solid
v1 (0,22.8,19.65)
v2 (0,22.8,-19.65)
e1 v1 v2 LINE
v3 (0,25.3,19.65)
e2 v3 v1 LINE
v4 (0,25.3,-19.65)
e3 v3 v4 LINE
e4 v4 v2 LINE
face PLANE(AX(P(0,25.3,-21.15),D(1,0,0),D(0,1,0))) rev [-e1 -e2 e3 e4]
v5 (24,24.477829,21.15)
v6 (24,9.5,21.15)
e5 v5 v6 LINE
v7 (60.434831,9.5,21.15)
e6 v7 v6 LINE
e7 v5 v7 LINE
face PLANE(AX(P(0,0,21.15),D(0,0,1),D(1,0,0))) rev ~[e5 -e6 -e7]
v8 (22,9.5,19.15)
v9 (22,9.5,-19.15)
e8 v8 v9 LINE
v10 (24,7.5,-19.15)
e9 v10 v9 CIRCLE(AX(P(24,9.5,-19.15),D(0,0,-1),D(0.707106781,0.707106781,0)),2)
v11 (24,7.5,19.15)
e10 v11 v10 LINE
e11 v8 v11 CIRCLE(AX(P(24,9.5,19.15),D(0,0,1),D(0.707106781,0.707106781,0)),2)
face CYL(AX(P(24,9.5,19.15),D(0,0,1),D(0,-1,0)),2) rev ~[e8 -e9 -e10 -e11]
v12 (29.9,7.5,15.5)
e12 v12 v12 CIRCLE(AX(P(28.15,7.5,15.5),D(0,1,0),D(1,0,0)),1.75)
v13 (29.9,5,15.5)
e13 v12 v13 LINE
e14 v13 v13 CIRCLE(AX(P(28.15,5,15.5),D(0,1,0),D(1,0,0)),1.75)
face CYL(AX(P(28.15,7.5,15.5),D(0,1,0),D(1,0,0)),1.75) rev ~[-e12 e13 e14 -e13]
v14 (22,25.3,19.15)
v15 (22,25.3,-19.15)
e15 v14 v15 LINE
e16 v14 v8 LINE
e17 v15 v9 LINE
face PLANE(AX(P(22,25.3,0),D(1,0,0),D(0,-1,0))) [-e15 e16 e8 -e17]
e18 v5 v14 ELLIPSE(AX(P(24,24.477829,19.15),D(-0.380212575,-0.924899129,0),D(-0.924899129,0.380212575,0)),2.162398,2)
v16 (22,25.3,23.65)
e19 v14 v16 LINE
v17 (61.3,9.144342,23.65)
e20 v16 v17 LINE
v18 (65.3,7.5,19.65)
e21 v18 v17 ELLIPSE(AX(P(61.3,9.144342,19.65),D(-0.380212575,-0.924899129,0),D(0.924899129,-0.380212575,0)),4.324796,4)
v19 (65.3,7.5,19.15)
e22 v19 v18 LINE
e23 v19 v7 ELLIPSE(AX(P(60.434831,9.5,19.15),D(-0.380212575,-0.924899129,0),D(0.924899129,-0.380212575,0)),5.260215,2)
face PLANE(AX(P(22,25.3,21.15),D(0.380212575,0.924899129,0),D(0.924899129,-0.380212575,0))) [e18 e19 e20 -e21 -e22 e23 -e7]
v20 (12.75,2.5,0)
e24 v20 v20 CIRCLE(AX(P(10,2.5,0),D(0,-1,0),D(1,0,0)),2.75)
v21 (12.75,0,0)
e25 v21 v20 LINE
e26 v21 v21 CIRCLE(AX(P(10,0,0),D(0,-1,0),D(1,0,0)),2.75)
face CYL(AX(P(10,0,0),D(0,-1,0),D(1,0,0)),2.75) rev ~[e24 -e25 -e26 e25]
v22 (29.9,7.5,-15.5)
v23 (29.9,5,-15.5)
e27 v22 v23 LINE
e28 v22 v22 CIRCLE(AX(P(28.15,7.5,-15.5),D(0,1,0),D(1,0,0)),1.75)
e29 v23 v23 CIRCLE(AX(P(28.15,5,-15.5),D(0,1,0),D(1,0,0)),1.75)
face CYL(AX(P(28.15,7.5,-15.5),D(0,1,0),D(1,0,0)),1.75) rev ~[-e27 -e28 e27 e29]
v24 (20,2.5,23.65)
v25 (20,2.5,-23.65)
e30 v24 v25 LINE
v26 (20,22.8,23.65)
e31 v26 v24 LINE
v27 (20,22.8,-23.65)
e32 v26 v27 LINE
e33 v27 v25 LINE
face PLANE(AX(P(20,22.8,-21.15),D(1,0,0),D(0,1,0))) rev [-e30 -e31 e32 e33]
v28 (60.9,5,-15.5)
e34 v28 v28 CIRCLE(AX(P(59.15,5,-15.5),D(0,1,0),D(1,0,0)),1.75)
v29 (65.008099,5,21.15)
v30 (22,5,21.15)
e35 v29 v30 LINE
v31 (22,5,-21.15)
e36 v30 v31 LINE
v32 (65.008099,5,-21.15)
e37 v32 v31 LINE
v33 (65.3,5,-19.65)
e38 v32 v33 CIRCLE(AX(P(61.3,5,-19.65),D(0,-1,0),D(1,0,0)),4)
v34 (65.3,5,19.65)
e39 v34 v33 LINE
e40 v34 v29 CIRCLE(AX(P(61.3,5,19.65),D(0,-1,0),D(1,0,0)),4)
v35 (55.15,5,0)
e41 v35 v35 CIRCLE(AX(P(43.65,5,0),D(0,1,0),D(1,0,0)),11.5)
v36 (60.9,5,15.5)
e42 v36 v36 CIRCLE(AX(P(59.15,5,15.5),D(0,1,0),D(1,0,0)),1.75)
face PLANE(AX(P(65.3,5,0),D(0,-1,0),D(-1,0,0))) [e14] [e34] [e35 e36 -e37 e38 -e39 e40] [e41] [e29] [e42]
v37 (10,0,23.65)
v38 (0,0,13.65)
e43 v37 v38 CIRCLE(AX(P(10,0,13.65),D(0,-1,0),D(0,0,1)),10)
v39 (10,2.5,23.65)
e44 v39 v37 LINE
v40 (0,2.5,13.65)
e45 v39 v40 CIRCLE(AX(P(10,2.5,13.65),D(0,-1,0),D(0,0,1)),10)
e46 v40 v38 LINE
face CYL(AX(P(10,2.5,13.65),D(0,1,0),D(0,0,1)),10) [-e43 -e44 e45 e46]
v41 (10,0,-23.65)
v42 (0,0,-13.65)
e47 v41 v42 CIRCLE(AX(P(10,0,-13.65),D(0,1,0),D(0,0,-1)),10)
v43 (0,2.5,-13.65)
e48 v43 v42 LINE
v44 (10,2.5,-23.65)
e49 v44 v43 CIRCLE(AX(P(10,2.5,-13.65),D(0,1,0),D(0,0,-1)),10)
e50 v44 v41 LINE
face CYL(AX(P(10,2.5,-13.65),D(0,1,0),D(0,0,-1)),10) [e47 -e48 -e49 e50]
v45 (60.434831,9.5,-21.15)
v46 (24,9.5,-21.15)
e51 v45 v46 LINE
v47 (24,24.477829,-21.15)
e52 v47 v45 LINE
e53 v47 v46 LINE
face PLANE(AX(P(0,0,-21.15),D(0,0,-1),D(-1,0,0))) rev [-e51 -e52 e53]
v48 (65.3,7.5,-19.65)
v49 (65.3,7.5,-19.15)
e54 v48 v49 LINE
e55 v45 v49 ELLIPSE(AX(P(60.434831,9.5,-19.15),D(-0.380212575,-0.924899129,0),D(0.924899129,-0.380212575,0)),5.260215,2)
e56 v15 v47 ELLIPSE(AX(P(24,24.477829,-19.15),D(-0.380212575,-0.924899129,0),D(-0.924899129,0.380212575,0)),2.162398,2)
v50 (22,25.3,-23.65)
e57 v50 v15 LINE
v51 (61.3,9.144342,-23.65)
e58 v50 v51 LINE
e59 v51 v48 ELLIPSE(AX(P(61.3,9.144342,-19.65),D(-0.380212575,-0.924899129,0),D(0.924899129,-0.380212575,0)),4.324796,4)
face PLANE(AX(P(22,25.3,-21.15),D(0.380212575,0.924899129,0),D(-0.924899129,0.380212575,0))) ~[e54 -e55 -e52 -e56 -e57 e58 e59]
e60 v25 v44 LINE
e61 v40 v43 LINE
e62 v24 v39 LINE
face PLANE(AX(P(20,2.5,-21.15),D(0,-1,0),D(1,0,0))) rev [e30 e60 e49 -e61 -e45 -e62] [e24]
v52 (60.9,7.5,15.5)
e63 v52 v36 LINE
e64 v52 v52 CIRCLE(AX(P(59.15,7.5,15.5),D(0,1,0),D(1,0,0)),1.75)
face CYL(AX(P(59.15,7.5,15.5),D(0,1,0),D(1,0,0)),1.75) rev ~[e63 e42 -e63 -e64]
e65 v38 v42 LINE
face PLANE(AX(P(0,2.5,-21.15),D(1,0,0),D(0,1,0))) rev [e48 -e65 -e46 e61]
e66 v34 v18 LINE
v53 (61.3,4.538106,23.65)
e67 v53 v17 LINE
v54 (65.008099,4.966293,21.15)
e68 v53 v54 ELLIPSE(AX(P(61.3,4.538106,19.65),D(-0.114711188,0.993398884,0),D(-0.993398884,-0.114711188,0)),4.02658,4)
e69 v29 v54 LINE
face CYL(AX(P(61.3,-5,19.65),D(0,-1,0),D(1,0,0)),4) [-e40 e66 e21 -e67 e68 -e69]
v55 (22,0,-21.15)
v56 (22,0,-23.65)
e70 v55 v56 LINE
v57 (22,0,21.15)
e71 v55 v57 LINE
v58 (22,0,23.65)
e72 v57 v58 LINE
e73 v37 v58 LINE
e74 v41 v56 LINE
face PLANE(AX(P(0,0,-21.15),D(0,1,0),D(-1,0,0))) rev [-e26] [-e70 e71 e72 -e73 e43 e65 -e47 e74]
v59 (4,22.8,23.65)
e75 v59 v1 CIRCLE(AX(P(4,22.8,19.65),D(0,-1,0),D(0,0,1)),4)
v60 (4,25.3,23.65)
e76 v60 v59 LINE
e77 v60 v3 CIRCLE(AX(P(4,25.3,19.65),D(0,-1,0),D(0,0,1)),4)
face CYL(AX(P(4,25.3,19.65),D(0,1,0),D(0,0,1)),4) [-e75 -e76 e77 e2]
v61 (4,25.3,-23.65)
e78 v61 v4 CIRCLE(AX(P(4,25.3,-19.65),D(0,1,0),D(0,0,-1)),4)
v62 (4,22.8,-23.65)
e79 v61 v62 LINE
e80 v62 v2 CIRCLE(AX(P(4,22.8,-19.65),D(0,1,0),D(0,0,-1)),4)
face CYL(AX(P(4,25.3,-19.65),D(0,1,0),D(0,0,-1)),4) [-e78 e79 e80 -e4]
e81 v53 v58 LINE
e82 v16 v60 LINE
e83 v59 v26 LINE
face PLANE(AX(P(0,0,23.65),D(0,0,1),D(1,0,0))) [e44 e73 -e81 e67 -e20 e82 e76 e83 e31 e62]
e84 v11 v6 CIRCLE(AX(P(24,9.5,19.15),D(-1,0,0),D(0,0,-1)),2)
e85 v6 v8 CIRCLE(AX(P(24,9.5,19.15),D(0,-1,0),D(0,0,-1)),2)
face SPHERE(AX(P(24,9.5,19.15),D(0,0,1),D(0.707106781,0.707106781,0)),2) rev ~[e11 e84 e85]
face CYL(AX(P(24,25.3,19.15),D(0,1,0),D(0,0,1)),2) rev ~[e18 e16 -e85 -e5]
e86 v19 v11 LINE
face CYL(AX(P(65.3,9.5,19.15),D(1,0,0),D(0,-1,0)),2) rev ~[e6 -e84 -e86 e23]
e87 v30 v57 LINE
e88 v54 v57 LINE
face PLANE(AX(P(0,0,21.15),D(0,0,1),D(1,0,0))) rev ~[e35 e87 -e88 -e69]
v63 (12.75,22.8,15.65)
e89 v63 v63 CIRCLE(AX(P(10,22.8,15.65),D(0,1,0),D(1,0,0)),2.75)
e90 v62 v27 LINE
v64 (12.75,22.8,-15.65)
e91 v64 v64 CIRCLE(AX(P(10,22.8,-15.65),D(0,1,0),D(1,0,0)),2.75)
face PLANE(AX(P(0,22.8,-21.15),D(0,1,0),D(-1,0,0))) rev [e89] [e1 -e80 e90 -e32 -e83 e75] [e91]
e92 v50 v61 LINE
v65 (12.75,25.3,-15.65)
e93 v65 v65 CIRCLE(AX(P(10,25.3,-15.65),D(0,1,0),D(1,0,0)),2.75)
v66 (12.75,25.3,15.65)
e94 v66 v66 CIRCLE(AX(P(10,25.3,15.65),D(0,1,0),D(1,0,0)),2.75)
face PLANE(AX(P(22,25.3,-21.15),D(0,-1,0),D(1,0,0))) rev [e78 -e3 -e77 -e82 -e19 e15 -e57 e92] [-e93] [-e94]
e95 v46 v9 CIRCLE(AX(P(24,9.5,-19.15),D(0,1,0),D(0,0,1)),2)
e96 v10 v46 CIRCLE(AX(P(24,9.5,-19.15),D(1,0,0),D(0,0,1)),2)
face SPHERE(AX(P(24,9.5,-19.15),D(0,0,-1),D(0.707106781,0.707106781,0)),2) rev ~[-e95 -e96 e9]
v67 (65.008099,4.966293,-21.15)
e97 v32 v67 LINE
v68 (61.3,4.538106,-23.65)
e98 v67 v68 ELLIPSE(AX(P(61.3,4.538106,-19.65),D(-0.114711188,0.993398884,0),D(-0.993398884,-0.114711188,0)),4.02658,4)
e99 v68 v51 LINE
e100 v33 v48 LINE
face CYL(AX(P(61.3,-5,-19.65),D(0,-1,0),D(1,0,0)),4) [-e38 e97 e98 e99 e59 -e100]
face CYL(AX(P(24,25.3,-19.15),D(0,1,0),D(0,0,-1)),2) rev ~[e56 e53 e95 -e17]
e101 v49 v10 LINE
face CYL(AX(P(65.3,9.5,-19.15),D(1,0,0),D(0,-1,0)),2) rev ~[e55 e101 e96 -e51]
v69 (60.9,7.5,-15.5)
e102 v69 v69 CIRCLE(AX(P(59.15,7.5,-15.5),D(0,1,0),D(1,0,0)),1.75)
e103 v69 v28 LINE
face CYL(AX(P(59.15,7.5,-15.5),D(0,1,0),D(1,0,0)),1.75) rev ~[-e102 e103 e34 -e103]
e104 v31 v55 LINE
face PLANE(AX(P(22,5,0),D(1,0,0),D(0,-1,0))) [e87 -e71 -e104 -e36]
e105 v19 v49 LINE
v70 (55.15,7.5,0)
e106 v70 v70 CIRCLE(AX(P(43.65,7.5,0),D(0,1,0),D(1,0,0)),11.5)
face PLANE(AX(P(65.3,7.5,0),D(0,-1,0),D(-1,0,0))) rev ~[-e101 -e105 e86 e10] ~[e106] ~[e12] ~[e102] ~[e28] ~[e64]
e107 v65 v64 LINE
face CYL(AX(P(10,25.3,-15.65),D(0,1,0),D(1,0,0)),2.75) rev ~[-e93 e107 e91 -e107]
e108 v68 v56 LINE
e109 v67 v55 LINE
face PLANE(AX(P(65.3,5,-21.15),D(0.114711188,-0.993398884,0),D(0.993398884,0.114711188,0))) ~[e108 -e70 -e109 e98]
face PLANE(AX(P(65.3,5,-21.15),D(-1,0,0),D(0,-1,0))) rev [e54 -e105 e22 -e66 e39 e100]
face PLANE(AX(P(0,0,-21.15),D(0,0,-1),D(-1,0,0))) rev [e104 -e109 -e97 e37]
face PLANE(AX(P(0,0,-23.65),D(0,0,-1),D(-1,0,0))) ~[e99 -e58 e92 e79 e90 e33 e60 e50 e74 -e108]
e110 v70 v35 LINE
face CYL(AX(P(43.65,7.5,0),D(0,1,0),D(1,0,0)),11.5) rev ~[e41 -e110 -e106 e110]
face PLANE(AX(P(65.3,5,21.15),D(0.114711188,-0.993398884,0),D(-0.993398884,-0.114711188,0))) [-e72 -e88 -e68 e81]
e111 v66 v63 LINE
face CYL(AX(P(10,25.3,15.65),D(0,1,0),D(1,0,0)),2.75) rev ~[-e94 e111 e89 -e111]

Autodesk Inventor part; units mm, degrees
ref_plane "YZ Plane" through (0, 0, 0) normal (1, 0, 0) x (0, 1, 0)
ref_plane "XZ Plane" through (0, 0, 0) normal (0, 1, 0) x (-1, 0, 0)
ref_plane "XY Plane" through (0, 0, 0) normal (0, 0, 1) x (1, 0, 0)
sketch "Sketch1" plane through (0, 0, 0) normal (0, 0, 1) x (1, 0, 0)
  line L0 (0, 0) -> (20, 0)
  line L1 (20, 0) -> (20, 2.5) construction
  line L2 (20, 2.5) -> (0, 2.5)
  line L3 (0, 2.5) -> (0, 0)
  line L4 (0, 25.3) -> (20, 25.3)
  line L5 (20, 25.3) -> (20, 22.8) construction
  line L6 (20, 22.8) -> (0, 22.8)
  line L7 (0, 22.8) -> (0, 25.3)
  line L8 (20, 22.8) -> (20, 2.5)
  line L9 (20, 25.3) -> (22, 25.3)
  line L10 (22, 25.3) -> (65.3, 7.5) construction
  line L11 (65.3, 7.5) -> (65.3, 5)
  line L12 (65.3, 5) -> (22, 0) construction
  line L13 (22, 0) -> (20, 0)
  line L14 (22, 25.3) -> (22, 0) construction
  line L15 (22, 25.3) -> (22, 7.5)
  line L16 (65.3, 7.5) -> (22, 7.5)
  line L17 (65.3, 5) -> (22, 5)
  line L18 (22, 5) -> (22, 0)
  dimension "d0" = 2.5
  dimension "d1" = 2.5
  dimension "d2" = 20
  dimension "d3" = 20.3
  dimension "d4" = 2
  dimension "d5" = 43.3
  dimension "d6" = 5
  dimension "d7" = 2.5
extrude "Extrusion1" add sketch "Sketch1" along normal mid plane 42.3
sketch "Sketch2" plane through (0, 0, 21.15) normal (0, 0, 1) x (1, 0, 0)
  line L0 (65.3, 5) -> (65.3, 7.5) projected
  line L1 (65.3, 7.5) -> (22, 7.5) construction
  line L2 (22, 7.5) -> (22, 25.3) construction
  line L3 (22, 25.3) -> (0, 25.3) projected
  line L4 (0, 25.3) -> (0, 22.8) projected
  line L5 (0, 22.8) -> (20, 22.8) projected
  line L6 (20, 22.8) -> (20, 2.5) projected
  line L7 (20, 2.5) -> (0, 2.5) projected
  line L8 (0, 2.5) -> (0, 0) projected
  line L9 (0, 0) -> (22, 0) projected
  line L10 (22, 0) -> (22, 5) construction
  line L11 (22, 5) -> (65.3, 5) construction
  line L12 (22, 7.5) -> (22, 25.3) construction
  line L13 (22, 25.3) -> (65.3, 7.5)
  line L14 (65.3, 5) -> (65.3, 7.5) projected
  line L15 (65.3, 5) -> (22, 0)
extrude "Extrusion2" add sketch "Sketch2" along normal blind 2.5
mirror "Mirror1" about plane through (0, 0, 0) normal (0, 0, 1) of "Extrusion2"
sketch "Sketch3" plane through (0, 25.3, 23.65) normal (0, 1, 0) x (1, 0, 0)
  line L0 (0, 47.3) -> (22, 47.3) projected
  line L1 (10, 47.3) -> (10, 0) construction
  line L2 (0, 0) -> (20, 0) projected
  circle A0 centre (10, 8) radius 2.75
  circle A1 centre (10, 39.3) radius 2.75
  line L3 (0, 47.3) -> (0, 0) projected
  point P0 (0, 23.65)
  dimension "d12" = 8
  dimension "d13" = 8
  dimension "d14" = 5.5
  dimension "d15" = 10
extrude "Extrusion3" cut sketch "Sketch3" against normal up to surface (2.5 mm away)
sketch "Sketch4" plane through (0, 0, 23.65) normal (0, -1, 0) x (1, 0, 0)
  line L0 (0, -23.65) -> (10, -23.65) construction
  circle A0 centre (10, -23.65) radius 2.75
  dimension "d18" = 5.5
  dimension "d19" = 10
extrude "Extrusion4" cut sketch "Sketch4" against normal up to surface (2.5 mm away)
sketch "Sketch5" plane through (22, 7.5, 21.15) normal (0, 1, 0) x (1, 0, 0)
  line L0 (0, 0) -> (0, -2.5) projected
  line L1 (43.3, 42.3) -> (43.3, 44.8) projected
  line L2 (0, 0) -> (43.3, 42.3) construction
  line L3 (6.15, 5.65) -> (37.15, 5.65) construction
  line L4 (37.15, 5.65) -> (37.15, 36.65) construction
  line L5 (37.15, 36.65) -> (6.15, 36.65) construction
  line L6 (6.15, 36.65) -> (6.15, 5.65) construction
  line L7 (6.15, 5.65) -> (37.15, 36.65) construction
  line L8 (37.15, 5.65) -> (6.15, 36.65) construction
  circle A0 centre (6.15, 36.65) radius 1.75
  circle A1 centre (37.15, 36.65) radius 1.75
  circle A2 centre (37.15, 5.65) radius 1.75
  circle A3 centre (6.15, 5.65) radius 1.75
  circle A4 centre (21.65, 21.15) radius 11.5
  point P0 (-22, 21.15)
  dimension "d22" = 31
  dimension "d23" = 31
  dimension "d24" = 3.5
  dimension "d25" = 23
extrude "Extrusion5" cut sketch "Sketch5" against normal through all
fillet "Fillet1" radius 10 2 edges at (0, 1.25, -23.65) (0, 1.25, 23.65)
fillet "Fillet1" radius 4 4 edges at (0, 24.05, -23.65) (0, 24.05, 23.65) (65.3, 6.25, 23.65) (65.3, 6.25, -23.65)
fillet "Fillet1" radius 2 5 edges at (43.65, 7.5, -21.15) (22, 7.5, 0) (43.65, 7.5, 21.15) (22, 16.4, 21.15) (22, 16.4, -21.15)
properties part number "MotorBracket2"
